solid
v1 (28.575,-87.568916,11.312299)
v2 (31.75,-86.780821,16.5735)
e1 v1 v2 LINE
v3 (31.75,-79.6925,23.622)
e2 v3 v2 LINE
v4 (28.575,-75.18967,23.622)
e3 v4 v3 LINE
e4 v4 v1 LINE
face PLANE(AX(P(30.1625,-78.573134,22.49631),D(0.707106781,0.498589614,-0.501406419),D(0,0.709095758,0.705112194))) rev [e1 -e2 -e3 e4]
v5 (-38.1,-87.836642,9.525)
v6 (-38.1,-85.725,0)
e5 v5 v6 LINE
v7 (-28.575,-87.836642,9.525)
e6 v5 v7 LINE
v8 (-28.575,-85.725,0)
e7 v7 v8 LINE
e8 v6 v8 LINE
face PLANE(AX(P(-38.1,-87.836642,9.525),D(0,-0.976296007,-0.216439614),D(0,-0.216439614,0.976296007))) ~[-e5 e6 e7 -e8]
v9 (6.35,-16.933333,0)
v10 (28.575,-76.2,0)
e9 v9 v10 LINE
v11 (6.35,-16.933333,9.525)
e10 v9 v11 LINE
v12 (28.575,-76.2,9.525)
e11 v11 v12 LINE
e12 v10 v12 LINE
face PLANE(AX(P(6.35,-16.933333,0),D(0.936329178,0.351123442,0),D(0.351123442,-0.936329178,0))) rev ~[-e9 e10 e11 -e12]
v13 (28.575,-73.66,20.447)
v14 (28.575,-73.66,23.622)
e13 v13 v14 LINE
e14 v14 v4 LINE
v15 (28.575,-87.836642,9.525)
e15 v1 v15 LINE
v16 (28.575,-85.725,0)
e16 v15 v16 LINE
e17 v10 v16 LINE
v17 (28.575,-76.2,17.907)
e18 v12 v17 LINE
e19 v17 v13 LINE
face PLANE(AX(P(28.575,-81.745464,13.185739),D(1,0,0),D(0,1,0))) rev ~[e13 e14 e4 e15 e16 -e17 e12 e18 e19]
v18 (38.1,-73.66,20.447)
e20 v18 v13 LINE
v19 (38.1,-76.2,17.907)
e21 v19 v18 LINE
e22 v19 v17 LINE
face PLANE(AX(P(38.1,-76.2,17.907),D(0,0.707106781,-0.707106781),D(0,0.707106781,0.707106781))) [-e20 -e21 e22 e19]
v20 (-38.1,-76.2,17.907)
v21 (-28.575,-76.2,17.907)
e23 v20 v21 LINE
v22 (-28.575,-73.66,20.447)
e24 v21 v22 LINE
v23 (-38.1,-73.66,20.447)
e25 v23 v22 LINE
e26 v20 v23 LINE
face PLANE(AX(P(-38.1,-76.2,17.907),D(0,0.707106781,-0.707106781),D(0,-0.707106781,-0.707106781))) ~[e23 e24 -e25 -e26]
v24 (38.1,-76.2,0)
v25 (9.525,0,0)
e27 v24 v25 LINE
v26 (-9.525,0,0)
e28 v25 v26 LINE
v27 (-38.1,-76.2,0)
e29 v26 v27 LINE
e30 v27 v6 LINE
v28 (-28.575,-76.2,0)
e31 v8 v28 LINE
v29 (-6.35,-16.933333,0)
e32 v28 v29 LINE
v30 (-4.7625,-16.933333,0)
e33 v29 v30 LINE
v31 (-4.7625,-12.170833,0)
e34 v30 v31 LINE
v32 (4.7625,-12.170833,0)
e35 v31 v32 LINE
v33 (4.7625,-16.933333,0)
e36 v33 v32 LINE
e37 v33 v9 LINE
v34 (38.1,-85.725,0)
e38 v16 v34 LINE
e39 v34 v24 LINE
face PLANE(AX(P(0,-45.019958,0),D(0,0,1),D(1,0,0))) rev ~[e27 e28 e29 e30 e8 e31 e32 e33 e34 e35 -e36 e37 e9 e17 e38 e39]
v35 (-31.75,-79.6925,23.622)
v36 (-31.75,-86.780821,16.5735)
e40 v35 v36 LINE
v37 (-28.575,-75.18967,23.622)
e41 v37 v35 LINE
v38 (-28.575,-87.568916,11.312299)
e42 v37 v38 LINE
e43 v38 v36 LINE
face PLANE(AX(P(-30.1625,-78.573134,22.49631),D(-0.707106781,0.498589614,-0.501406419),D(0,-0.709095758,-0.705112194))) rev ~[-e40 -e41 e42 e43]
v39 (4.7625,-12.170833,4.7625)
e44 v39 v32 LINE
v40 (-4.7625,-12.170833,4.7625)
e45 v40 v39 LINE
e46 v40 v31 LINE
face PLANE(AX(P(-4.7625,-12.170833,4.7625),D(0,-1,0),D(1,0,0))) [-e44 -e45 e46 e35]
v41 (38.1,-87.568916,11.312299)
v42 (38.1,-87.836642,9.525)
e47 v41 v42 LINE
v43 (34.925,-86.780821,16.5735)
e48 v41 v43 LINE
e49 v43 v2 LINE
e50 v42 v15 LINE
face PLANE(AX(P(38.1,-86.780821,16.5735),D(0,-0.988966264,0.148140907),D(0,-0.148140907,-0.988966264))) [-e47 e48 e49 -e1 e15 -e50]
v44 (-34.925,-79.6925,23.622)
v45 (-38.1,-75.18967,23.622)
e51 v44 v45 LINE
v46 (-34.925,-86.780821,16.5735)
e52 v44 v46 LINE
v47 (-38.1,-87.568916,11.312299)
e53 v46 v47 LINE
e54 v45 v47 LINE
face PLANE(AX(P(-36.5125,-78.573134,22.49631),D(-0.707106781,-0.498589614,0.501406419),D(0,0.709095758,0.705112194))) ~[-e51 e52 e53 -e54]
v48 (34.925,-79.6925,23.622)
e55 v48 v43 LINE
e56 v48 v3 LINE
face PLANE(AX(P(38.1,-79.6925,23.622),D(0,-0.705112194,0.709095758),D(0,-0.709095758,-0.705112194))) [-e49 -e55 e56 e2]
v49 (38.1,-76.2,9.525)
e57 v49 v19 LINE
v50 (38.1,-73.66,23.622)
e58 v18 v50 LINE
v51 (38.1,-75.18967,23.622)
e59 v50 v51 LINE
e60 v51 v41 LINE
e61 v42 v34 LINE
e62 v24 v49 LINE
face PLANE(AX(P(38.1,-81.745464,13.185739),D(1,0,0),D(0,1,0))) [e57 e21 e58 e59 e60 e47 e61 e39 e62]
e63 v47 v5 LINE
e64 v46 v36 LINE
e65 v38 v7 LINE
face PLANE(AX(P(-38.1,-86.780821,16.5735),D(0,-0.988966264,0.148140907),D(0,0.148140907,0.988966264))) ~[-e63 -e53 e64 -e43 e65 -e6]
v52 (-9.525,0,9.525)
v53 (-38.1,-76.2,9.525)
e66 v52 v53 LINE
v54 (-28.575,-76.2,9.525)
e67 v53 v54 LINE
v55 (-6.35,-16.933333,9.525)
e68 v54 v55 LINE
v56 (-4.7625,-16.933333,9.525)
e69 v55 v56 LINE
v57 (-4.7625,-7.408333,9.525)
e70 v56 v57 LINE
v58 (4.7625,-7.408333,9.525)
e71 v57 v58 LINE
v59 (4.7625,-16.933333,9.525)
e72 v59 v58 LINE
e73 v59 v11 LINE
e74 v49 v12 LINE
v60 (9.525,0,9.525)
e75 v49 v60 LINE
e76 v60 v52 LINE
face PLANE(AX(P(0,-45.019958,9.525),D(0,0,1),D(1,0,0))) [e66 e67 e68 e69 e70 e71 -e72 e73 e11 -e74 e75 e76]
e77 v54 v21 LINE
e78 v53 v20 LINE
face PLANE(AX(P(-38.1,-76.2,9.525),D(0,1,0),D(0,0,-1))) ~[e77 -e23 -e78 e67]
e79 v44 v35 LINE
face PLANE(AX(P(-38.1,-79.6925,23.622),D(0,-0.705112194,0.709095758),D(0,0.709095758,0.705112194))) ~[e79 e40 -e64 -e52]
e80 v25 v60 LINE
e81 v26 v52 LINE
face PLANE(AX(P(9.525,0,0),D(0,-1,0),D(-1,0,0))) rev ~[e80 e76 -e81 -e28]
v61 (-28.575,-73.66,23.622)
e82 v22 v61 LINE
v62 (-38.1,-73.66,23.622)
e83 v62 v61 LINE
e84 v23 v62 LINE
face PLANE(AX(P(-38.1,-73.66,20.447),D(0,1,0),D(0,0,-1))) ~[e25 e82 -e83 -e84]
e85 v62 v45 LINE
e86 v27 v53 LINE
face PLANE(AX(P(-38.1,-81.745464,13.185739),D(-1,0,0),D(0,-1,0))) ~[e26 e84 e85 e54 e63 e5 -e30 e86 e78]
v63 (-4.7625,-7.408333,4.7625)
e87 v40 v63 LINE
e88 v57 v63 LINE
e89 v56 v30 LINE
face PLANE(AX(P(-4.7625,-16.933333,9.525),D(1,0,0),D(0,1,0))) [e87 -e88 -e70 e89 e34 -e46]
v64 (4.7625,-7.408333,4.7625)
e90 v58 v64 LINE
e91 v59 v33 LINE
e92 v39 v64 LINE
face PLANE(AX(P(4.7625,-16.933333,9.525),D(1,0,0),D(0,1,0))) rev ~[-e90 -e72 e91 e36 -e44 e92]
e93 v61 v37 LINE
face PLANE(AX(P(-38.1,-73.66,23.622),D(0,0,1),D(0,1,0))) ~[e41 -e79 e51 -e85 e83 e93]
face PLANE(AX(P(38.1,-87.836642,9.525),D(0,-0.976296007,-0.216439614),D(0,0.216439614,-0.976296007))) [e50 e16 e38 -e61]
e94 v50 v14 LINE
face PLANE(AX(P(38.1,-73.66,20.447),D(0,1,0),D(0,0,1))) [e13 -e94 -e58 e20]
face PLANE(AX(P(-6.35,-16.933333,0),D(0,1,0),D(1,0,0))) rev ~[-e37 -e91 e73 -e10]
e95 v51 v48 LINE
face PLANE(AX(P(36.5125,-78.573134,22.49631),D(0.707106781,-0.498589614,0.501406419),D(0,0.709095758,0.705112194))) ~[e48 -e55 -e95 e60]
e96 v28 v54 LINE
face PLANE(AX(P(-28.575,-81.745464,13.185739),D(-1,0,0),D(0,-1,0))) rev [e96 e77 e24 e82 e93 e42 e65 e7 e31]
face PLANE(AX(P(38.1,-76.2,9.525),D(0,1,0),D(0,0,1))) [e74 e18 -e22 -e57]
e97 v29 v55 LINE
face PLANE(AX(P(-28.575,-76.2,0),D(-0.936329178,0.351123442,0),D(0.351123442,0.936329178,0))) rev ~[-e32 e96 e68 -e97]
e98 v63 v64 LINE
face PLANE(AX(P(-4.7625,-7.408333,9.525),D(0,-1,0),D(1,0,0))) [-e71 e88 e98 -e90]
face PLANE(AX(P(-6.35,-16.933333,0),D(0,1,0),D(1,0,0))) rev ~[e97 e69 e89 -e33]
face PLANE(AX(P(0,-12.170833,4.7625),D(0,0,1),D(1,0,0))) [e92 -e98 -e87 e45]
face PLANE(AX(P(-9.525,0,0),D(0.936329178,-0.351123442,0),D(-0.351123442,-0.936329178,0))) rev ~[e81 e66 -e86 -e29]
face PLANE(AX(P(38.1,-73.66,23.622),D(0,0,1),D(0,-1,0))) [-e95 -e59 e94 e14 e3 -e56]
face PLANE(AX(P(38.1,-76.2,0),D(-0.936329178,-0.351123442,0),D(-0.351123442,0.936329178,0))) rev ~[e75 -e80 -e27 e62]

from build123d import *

# Parameters (mm, degrees)
F1_DEPTH = 9.525
F3_DEPTH = 9.525
F4_W     = 9.525
F4_H     = 9.525
F5_DEPTH = 4.7625
F6_W     = 9.525
F6_H     = 4.7625
F7_DEPTH = 4.7635
F8_SIZE  = 3.175


# Not quite as in the source:
# - a pattern or mirror of a feature is missing from the dataset's text; its kind, count and spacing are read off the source's solid


with BuildPart() as f1:
    # F0 (on Top) → F1 (new body)
    with BuildSketch(Plane.XY):
        Polygon((9.525, 0), (0, 0), (-9.525, 0), (-38.1, -76.2), (-38.1, -85.725), (-28.575, -85.725), (-28.575, -76.2), (-6.35, -16.9333333333), (0, -16.9333333333), (6.35, -16.9333333333), (28.575, -76.2), (28.575, -85.725), (38.1, -85.725), (38.1, -76.2), align=None)
    extrude(amount=F1_DEPTH)

    # F2 (on face) → F3 (join)
    with BuildSketch(Plane.YZ.offset(38.1)):
        Polygon((-85.725, 9.525), (-76.2, 9.525), (-76.2, 17.907), (-76.2, 20.447), (-73.66, 20.447), (-73.66, 23.622), (-79.6925, 23.622), (-86.7808208308, 16.5735), (-87.8366416617, 9.525), (-85.725, 0), align=None)
        Polygon((-76.2, 20.447), (-76.2, 17.907), (-73.66, 20.447), align=None)
    f3 = extrude(amount=-F3_DEPTH)

    # F3_copies: F3 across plane
    add(f3.mirror(Plane(origin=(0, 0, 0), x_dir=(0, 0, -1), z_dir=(-1, 0, 0))))

    # F4 (on face) → F5 (cut)
    with BuildSketch(Plane.XY.offset(9.525)):
        with Locations((0, -12.1708333333)):
            Rectangle(F4_W, F4_H)
    extrude(amount=-F5_DEPTH, mode=Mode.SUBTRACT)

    # F6 (on face) → F7 (cut, through all)
    with BuildSketch(Plane.XY.offset(4.7625)):
        with Locations((0, -14.5520833333)):
            Rectangle(F6_W, F6_H)
    extrude(amount=-F7_DEPTH, mode=Mode.SUBTRACT)

    # F8
    f8_edges = [f1.edges().sort_by_distance(p)[0] for p in [
        (38.1, -83.23666, 20.09775),
        (28.575, -83.23666, 20.09775),
        (-38.1, -83.23666, 20.09775),
        (-28.575, -83.23666, 20.09775),
    ]]
    chamfer(f8_edges, length=F8_SIZE)


solid = f1.part
